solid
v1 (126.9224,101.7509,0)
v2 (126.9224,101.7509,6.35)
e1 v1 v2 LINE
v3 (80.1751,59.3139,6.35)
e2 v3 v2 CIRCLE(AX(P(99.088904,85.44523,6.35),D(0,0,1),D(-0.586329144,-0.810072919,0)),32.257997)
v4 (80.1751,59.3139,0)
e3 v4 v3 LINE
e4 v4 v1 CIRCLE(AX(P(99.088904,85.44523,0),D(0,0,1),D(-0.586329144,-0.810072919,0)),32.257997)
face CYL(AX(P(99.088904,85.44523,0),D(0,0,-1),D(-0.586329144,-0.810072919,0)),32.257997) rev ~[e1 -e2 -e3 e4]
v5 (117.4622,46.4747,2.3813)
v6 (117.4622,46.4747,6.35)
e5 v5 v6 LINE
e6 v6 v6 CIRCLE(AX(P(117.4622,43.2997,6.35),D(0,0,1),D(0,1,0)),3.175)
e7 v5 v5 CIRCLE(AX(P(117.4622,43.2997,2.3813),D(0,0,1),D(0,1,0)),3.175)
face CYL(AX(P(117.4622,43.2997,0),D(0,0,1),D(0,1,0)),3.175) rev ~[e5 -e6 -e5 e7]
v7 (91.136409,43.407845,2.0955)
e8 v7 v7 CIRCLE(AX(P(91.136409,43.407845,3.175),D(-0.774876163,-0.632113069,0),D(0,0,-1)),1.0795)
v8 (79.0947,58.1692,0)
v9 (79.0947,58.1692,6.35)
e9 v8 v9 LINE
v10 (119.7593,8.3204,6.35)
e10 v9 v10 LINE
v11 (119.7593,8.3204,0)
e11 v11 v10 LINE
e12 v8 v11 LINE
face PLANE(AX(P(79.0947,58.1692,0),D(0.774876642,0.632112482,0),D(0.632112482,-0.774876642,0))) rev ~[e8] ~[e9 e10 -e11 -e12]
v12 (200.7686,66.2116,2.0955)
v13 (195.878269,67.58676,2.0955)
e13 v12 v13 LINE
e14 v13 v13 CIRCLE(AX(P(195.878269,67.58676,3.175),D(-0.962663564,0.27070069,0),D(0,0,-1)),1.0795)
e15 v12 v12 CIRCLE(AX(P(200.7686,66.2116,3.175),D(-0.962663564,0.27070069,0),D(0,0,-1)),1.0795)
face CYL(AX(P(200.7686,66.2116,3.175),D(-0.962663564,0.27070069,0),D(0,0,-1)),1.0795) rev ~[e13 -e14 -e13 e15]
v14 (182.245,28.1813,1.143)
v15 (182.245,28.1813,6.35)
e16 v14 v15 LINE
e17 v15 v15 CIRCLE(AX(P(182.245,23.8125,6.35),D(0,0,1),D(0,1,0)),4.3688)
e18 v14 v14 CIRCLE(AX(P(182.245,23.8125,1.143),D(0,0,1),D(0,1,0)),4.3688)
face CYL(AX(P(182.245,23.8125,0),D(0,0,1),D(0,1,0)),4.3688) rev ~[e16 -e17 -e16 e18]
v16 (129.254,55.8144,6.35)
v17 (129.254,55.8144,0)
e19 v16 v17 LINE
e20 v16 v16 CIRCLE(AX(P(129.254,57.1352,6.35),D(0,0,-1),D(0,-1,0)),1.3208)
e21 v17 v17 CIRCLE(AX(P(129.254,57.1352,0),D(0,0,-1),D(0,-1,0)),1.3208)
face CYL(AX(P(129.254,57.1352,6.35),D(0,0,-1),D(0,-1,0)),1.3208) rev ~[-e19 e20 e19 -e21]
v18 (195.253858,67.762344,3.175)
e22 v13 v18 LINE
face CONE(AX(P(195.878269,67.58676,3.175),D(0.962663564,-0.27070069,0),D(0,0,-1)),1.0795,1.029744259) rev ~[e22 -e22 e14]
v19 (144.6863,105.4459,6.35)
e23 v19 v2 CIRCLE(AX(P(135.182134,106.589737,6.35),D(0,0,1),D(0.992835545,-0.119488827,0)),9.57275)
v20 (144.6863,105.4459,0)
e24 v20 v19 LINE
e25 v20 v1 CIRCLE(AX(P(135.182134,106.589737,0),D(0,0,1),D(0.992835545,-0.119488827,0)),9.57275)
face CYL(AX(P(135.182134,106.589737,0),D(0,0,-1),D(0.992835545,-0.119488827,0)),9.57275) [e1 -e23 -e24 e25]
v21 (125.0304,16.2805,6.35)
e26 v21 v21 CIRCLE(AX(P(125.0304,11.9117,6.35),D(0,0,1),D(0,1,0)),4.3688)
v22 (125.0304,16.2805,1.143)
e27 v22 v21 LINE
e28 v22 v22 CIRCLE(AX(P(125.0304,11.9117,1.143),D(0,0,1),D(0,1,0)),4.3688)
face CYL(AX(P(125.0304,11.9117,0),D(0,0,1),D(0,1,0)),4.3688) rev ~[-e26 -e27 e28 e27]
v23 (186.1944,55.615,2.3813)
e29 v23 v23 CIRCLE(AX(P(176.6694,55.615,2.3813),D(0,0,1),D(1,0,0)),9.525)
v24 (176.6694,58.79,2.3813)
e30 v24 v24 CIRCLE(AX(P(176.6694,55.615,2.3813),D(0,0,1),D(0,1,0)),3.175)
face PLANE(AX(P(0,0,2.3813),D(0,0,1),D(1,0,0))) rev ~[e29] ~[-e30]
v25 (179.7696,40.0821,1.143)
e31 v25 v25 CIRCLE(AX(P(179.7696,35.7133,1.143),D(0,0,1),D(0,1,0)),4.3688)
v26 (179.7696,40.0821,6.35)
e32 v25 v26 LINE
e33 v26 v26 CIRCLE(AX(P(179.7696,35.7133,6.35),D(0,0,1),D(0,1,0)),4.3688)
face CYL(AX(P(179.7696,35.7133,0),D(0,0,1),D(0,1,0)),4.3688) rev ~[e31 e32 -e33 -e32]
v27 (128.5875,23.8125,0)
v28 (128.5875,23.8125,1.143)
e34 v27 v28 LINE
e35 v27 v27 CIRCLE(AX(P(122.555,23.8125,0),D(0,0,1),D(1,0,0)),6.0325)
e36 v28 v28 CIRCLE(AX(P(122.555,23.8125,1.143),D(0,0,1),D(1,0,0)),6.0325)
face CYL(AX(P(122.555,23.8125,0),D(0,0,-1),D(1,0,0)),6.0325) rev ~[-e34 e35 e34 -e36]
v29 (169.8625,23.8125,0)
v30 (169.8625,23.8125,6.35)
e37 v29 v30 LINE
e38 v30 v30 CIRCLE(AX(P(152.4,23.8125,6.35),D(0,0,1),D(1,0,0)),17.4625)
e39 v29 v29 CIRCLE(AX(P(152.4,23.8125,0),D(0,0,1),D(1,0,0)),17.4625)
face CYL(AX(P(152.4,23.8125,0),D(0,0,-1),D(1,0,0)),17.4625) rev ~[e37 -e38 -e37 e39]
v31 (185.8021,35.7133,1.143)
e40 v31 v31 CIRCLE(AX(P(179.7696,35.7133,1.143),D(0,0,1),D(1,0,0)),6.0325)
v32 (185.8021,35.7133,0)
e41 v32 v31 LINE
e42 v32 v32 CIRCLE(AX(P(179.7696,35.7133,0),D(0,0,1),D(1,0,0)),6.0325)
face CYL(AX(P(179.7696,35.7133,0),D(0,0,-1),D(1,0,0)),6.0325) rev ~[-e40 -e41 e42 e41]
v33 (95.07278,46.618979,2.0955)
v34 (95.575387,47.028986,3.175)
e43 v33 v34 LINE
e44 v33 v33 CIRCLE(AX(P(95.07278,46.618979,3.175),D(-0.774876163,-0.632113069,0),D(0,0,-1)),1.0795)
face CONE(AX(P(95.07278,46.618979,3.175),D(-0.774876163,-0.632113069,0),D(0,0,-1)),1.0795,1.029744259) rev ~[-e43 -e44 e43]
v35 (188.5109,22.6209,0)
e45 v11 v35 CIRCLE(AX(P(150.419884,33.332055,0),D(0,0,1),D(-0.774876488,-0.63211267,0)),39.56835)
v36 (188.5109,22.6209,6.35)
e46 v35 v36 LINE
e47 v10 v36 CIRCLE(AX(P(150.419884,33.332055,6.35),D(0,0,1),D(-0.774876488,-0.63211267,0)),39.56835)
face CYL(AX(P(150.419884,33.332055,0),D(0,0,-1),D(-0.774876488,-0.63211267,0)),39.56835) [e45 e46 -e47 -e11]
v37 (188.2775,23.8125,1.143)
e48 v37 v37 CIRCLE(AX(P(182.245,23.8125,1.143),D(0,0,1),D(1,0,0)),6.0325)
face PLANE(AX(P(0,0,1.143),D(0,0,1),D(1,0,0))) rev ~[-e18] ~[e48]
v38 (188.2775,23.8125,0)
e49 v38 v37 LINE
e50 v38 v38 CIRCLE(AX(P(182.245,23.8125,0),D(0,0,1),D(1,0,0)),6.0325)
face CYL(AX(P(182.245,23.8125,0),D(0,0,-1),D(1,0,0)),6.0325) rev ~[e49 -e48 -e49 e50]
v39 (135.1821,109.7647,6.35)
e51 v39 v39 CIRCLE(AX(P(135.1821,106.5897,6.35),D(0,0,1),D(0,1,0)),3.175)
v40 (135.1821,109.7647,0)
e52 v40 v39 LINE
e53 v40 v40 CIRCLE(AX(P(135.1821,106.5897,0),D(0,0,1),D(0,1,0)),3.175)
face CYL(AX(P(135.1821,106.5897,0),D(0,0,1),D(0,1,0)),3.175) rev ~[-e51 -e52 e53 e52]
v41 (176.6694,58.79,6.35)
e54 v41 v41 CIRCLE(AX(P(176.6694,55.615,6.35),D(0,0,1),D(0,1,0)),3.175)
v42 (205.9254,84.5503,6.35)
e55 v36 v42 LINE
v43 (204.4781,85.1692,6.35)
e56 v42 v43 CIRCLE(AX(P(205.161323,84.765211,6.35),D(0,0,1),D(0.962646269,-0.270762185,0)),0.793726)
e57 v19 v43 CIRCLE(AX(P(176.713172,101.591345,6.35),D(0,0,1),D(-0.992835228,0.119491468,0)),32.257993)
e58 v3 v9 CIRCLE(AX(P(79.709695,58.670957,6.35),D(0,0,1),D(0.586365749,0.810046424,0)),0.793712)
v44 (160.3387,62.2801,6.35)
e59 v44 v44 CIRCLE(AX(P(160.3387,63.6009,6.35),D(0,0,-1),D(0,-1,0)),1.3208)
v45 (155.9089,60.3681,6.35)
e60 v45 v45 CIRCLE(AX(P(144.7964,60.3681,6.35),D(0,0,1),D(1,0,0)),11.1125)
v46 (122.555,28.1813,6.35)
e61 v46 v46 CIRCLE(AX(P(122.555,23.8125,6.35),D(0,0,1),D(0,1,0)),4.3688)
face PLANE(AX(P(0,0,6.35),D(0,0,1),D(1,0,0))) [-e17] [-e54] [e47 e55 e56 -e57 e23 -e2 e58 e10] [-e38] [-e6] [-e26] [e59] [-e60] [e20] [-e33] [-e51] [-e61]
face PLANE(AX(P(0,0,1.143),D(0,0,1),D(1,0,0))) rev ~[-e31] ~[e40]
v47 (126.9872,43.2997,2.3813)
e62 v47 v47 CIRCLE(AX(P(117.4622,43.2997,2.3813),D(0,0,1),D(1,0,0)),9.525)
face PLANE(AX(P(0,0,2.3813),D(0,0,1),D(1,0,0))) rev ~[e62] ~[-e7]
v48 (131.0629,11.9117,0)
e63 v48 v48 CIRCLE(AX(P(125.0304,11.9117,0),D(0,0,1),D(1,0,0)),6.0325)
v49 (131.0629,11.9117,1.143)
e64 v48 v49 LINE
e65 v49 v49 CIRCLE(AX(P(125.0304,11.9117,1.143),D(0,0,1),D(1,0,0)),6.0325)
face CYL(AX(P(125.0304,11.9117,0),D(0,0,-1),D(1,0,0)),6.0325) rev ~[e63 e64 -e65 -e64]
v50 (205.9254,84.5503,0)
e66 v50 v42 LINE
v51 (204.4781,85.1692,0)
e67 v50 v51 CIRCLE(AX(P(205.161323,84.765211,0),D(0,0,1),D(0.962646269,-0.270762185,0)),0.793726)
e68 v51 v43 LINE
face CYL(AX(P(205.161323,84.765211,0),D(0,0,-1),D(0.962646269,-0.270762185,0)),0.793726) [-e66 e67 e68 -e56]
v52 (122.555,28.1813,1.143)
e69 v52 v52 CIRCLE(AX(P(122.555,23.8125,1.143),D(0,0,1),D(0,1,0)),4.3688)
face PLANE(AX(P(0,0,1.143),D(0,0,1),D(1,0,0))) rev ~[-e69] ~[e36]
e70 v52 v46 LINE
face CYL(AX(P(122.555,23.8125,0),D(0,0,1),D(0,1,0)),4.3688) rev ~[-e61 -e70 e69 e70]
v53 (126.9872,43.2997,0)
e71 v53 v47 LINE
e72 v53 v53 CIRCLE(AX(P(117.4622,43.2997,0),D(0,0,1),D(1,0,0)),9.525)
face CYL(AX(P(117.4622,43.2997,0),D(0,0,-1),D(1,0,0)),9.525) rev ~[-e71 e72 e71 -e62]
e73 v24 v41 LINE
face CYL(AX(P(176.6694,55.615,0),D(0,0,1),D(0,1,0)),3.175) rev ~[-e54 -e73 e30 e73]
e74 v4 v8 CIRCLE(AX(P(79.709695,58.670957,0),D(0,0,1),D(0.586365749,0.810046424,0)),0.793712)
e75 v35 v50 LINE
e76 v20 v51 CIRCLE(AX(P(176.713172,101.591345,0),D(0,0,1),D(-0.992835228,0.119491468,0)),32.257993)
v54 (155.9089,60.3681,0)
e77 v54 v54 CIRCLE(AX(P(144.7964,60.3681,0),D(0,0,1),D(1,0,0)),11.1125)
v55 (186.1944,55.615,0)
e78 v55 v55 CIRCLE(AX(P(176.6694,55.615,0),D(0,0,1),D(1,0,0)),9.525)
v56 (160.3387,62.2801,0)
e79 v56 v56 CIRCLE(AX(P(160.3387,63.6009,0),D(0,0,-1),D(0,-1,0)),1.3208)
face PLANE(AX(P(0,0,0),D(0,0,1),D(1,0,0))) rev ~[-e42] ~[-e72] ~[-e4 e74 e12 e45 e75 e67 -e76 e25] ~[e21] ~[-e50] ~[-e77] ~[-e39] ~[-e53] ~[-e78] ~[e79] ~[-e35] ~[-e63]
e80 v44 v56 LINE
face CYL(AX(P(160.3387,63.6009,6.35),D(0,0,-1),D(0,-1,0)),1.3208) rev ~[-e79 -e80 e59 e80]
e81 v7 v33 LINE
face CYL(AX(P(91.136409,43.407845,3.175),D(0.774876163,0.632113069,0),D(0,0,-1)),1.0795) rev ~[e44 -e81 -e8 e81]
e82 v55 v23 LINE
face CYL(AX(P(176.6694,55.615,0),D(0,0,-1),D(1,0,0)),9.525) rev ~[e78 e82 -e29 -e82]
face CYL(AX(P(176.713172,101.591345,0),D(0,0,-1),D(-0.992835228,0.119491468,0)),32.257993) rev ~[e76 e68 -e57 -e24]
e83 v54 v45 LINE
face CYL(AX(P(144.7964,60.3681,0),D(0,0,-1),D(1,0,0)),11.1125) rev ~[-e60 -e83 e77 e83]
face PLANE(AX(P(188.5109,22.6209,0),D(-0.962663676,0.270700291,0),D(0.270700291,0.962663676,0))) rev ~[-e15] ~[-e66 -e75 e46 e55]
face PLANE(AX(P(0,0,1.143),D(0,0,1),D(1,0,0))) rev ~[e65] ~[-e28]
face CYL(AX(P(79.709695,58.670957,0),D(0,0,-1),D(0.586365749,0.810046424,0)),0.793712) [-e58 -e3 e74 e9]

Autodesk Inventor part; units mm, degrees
ref_plane "YZ Plane" through (0, 0, 0) normal (1, 0, 0) x (0, 1, 0)
ref_plane "XZ Plane" through (0, 0, 0) normal (0, 1, 0) x (-1, 0, 0)
sketch "Main Outline" plane through (0, 0, 0) normal (0, 0, 1) x (1, 0, 0)
  line L0 (0, 0) -> (304.8, 0) construction
  line L1 (304.8, 0) -> (304.8, 50.8) construction
  line L2 (304.8, 50.8) -> (0, 50.8) construction
  line L3 (0, 50.8) -> (0, 0) construction
  line L4 (0, 50.8) -> (0, 53.34) construction
  line L5 (0, 53.34) -> (304.8, 53.34) construction
  line L6 (304.8, 53.34) -> (304.8, 50.8) construction
  circle A0 centre (152.4, 23.8125) radius 17.4625 construction
  line L7 (152.4, 23.8125) -> (152.4, 0) construction
  circle A1 centre (152.4, 23.8125) radius 27.94 construction
  circle A2 centre (152.4, 23.8125) radius 21.59 construction
  line L8 (152.4, 23.8125) -> (144.7964, 60.3681) construction
  circle A3 centre (144.7964, 60.3681) radius 15.24 construction
  circle A4 centre (144.7964, 60.3681) radius 8.89 construction
  circle A5 centre (144.7964, 60.3681) radius 14.2875 construction
  arc A6 (164.6591, 71.8014) -> (129.0153, 43.7486) centre (144.7964, 60.3681) ccw construction
  circle A7 centre (98.8106, 85.598) radius 32.258 construction
  circle A8 centre (126.6733, 147.4971) radius 32.258 construction
  circle A9 centre (176.9075, 101.8424) radius 32.258 construction
  circle A10 centre (144.7964, 60.3681) radius 11.1125 construction
  circle A11 centre (152.4, 23.8125) radius 49.53 construction
  line L9 (144.7964, 60.3681) -> (126.6733, 147.4971) construction
  line L10 (144.7964, 60.3681) -> (98.8106, 85.598) construction
  line L11 (98.8106, 85.598) -> (176.9075, 101.8424) construction
  line L12 (176.9075, 101.8424) -> (144.7964, 60.3681) construction
  circle A12 centre (98.8106, 85.598) radius 9.5493 construction
  arc A13 (174.9629, 111.1915) -> (185.6989, 98.1139) centre (176.9075, 101.8424) ccw construction
  circle A14 centre (126.6733, 147.4971) radius 9.5493 construction
  line L13 (96.8659, 94.9472) -> (174.9629, 111.1915) construction
  line L14 (185.6989, 98.1139) -> (165.8956, 51.4198) construction
  line L15 (92.2351, 78.6732) -> (129.0153, 43.7486) construction
  line L16 (174.9629, 111.1915) -> (176.9075, 101.8424) construction
  line L17 (176.9075, 101.8424) -> (185.6989, 98.1139) construction
  arc A15 (185.6989, 98.1139) -> (174.9629, 111.1915) centre (176.9075, 101.8424) ccw construction
  arc A16 (165.8956, 51.4198) -> (164.6591, 71.8014) centre (144.7964, 60.3681) ccw construction
  arc A17 (129.0153, 43.7486) -> (165.8956, 51.4198) centre (144.7964, 60.3681) ccw construction
  circle A18 centre (126.6086, 147.808) radius 32.258 construction
  circle A19 centre (126.544, 148.1188) radius 32.258 construction
  circle A20 centre (126.4793, 148.4297) radius 32.258 construction
  line L18 (126.6733, 147.4971) -> (126.4793, 148.4297) construction
  circle A21 centre (126.738, 147.1863) radius 32.258 construction
  circle A22 centre (117.4622, 43.2997) radius 9.525 construction
  circle A23 centre (176.6694, 55.615) radius 9.525 construction
  line L19 (152.4, 23.8125) -> (117.4622, 43.2997) construction
  line L20 (152.4, 23.8125) -> (176.6694, 55.615) construction
  line L21 (117.4622, 43.2997) -> (98.8106, 85.598) construction
  line L22 (176.6694, 55.615) -> (176.9075, 101.8424) construction
  circle A24 centre (135.1821, 106.5897) radius 7.9375 construction
  line L23 (135.6243, 150.8242) -> (166.2787, 68.353) construction
  circle A25 centre (152.4, 23.8125) radius 29.845 construction
  line L24 (117.1381, 146.979) -> (121.9118, 59.1246) construction
  circle A26 centre (99.0889, 85.4453) radius 32.258 construction
  circle A27 centre (97.9755, 86.0562) radius 32.258 construction
  line L25 (97.9755, 86.0562) -> (98.8106, 85.598) construction
  circle A28 centre (98.2538, 85.9034) radius 32.258 construction
  circle A29 centre (98.5322, 85.7507) radius 32.258 construction
  circle A30 centre (152.4, 23.8125) radius 29.845 construction
  circle A31 centre (122.555, 23.8125) radius 6.35 construction
  circle A32 centre (179.7696, 35.7133) radius 6.35 construction
  line L26 (122.555, 23.8125) -> (152.4, 23.8125) construction
  line L27 (152.4, 23.8125) -> (182.245, 23.8125) construction
  circle A33 centre (182.245, 23.8125) radius 6.35 construction
  circle A34 centre (125.0304, 11.9117) radius 6.35 construction
  circle A35 centre (150.4199, 33.3321) radius 39.5684 construction
  line L28 (72.9795, 65.6655) -> (119.7593, 8.3204) construction
  circle A36 centre (177.4906, 102.5955) radius 32.258 construction
  line L29 (176.9075, 101.8424) -> (177.4906, 102.5955) construction
  circle A37 centre (177.2963, 102.3445) radius 32.258 construction
  circle A38 centre (177.1019, 102.0934) radius 32.258 construction
  circle A39 centre (176.7131, 101.5913) radius 32.258 construction
  line L30 (188.5109, 22.6209) -> (208.5442, 93.8632) construction
  circle A40 centre (135.1821, 106.5897) radius 9.5727 construction
  arc A41 (86.8202, 116.3239) -> (96.3065, 136.4856) centre (81.3304, 131.2195) ccw construction
  arc A42 (158.9123, 149.5077) -> (175.6513, 134.801) centre (174.7462, 150.6502) ccw construction
  line L31 (126.4793, 148.4297) -> (126.9966, 145.9429) construction
  line L32 (116.5322, 146.3607) -> (117.0495, 143.8739) construction
  line L33 (136.9437, 148.0119) -> (136.4264, 150.4987) construction
  arc A43 (136.4264, 150.4987) -> (116.5322, 146.3607) centre (126.4793, 148.4297) ccw construction
  arc A44 (117.0495, 143.8739) -> (136.9437, 148.0119) centre (126.9966, 145.9429) ccw construction
  line L34 (177.4906, 102.5955) -> (175.9357, 100.5871) construction
  line L35 (169.4571, 108.8154) -> (167.9021, 106.807) construction
  line L36 (183.9692, 94.3672) -> (185.5242, 96.3756) construction
  arc A45 (185.5242, 96.3756) -> (169.4571, 108.8154) centre (177.4906, 102.5955) ccw construction
  arc A46 (167.9021, 106.807) -> (183.9692, 94.3672) centre (175.9357, 100.5871) ccw construction
  line L37 (97.9755, 86.0562) -> (100.2023, 84.8344) construction
  line L38 (93.0884, 77.1487) -> (95.3153, 75.927) construction
  line L39 (105.0894, 93.7418) -> (102.8625, 94.9636) construction
  arc A47 (102.8625, 94.9636) -> (93.0884, 77.1487) centre (97.9755, 86.0562) ccw construction
  arc A48 (95.3153, 75.927) -> (105.0894, 93.7418) centre (100.2023, 84.8344) ccw construction
  circle A49 centre (117.4622, 43.2997) radius 3.9687 construction
  circle A50 centre (176.6694, 55.615) radius 3.9687 construction
  line L40 (152.4, 23.8125) -> (158.4777, -5.4071) construction
  arc A51 (80.1751, 59.3139) -> (79.0947, 58.1692) centre (79.7097, 58.6709) ccw construction
  arc A52 (205.9254, 84.5503) -> (204.4781, 85.1692) centre (205.1613, 84.7652) ccw construction
  circle A53 centre (152.4, 23.8125) radius 14.224 construction
  circle A54 centre (135.1821, 106.5897) radius 3.9687 construction
  circle A55 centre (156.538, 3.9183) radius 6.35 construction
  circle A56 centre (156.538, 3.9183) radius 2.0828 construction
  circle A57 centre (152.4, 23.8125) radius 20.32 construction
  line L41 (133.1021, 30.1759) -> (152.4, 23.8125) construction
  line L42 (152.4, 23.8125) -> (167.5599, 37.3432) construction
  circle A58 centre (167.5599, 37.3432) radius 2.0828 construction
  circle A59 centre (167.5599, 37.3432) radius 3.9687 construction
  circle A60 centre (133.1021, 30.1759) radius 2.0828 construction
  circle A61 centre (133.1021, 30.1759) radius 3.9688 construction
  point P0 (126.738, 147.1863)
  point P1 (176.7131, 101.5913)
  dimension "d18" = 99.06
  dimension "d58" = 64.516
  dimension "d86" = 64.516
  dimension "d0" = 304.8
  dimension "d1" = 50.8
  dimension "d2" = 2.54
  dimension "d3" = 34.925
  dimension "d4" = 23.8125
  dimension "d5" = 152.4
  dimension "d6" = 55.88
  dimension "d7" = 43.18
  dimension "d8" = 37.338
  dimension "d10" = 30.48
  dimension "d11" = 17.78
  dimension "d12" = 28.575
  dimension "d13" = 45.8366
  dimension "d14" = 64.516
  dimension "d15" = 64.516
  dimension "d16" = 64.516
  dimension "d17" = 22.225
  dimension "d19" = 52.4523
  dimension "d20" = 88.9939
  dimension "d21" = 19.0986
  dimension "d22" = 19.0986
  dimension "d23" = 19.0986
  dimension "d30" = 124.732
  dimension "d40" = 64.516
  dimension "d41" = 64.516
  dimension "d42" = 64.516
  dimension "d43" = 0.9525
  dimension "d44" = 0.3175
  dimension "d45" = 0.635
  dimension "d46" = 64.516
  dimension "d47" = 0.3175
  dimension "d48" = 19.05
  dimension "d49" = 19.05
  dimension "d50" = 40.005
  dimension "d51" = 40.005
  dimension "d52" = 46.228
  dimension "d54" = 46.228
  dimension "d55" = 15.875
  dimension "d56" = 41.4655
  dimension "d57" = 59.69
  dimension "d59" = 64.516
  dimension "d60" = 64.516
  dimension "d61" = 64.516
  dimension "d62" = 0.3175
  dimension "d63" = 0.3175
  dimension "d64" = 0.635
  dimension "d65" = 0.9525
  dimension "d73" = 12.7
  dimension "d74" = 12.7
  dimension "d76" = 59.69
  dimension "d78" = 12.7
  dimension "d79" = 12.7
  dimension "d80" = 64.516
  dimension "d81" = 0.9525
  dimension "d82" = 64.516
  dimension "d83" = 64.516
  dimension "d84" = 0.3175
  dimension "d85" = 0.635
  dimension "d88" = 0.3175
  dimension "d89" = 31.75
  dimension "d90" = 31.75
  dimension "d94" = 1.5875
  dimension "d95" = 20.32
  dimension "d96" = 1.5875
sketch "Upper CIM C-C Check" plane through (0, 0, 0) normal (0, 0, 1) x (1, 0, 0)
  arc A0 (3.4429, -22.6582) -> (3.4429, 22.6582) centre (0, 0) ccw construction
  arc A1 (90.4285, 9.4409) -> (90.4285, -9.4409) centre (88.9939, 0) ccw construction
  line L0 (88.9939, 0) -> (0, 0) construction
  line L1 (90.4285, 9.4409) -> (3.4429, 22.6582)
  line L2 (3.4429, -22.6582) -> (90.4285, -9.4409)
  arc A2 (90.4285, -9.4409) -> (90.4285, 9.4409) centre (88.9939, 0) ccw
  arc A3 (3.4429, 22.6582) -> (3.4429, -22.6582) centre (0, 0) ccw
  dimension "d24" = 45.8366
  dimension "d25" = 19.0986
  dimension "d26" = 78.9119
  dimension "d27" = 87.984
  dimension "d28" = 27.12
  dimension "d29" = 88.9939
sketch "Mounting Plate" plane through (0, 0, 0) normal (0, 0, 1) x (1, 0, 0)
  arc A0 (80.1751, 59.3139) -> (79.0947, 58.1692) centre (79.7097, 58.6709) ccw construction
  circle A1 centre (135.1821, 106.5897) radius 9.5727 construction
  arc A2 (205.9254, 84.5503) -> (204.4781, 85.1692) centre (205.1613, 84.7652) ccw construction
  circle A3 centre (150.4199, 33.3321) radius 39.5684 construction
  circle A4 centre (152.4, 23.8125) radius 17.4625 projected
  circle A5 centre (152.4, 23.8125) radius 29.845 construction
  circle A6 centre (122.555, 23.8125) radius 6.35 construction
  circle A7 centre (125.0304, 11.9117) radius 6.35 construction
  circle A8 centre (182.245, 23.8125) radius 6.35 construction
  circle A9 centre (179.7696, 35.7133) radius 6.35 construction
  circle A10 centre (144.7964, 60.3681) radius 11.1125 projected
  arc A11 (80.1751, 59.3139) -> (126.9224, 101.7509) centre (99.0889, 85.4453) ccw
  arc A12 (144.6863, 105.4459) -> (204.4781, 85.1692) centre (176.7131, 101.5913) ccw
  line L0 (79.0947, 58.1692) -> (119.7593, 8.3204)
  line L1 (188.5109, 22.6209) -> (205.9254, 84.5503)
  circle A13 centre (117.4622, 43.2997) radius 9.525 projected
  circle A14 centre (176.6694, 55.615) radius 9.525 projected
  arc A15 (144.6863, 105.4459) -> (126.9224, 101.7509) centre (135.1821, 106.5897) ccw
  arc A16 (205.9254, 84.5503) -> (204.4781, 85.1692) centre (205.1613, 84.7652) ccw
  arc A17 (80.1751, 59.3139) -> (79.0947, 58.1692) centre (79.7097, 58.6709) ccw
  arc A18 (119.7593, 8.3204) -> (188.5109, 22.6209) centre (150.4199, 33.3321) ccw
  circle A19 centre (122.555, 23.8125) radius 6.0325
  circle A20 centre (125.0304, 11.9117) radius 6.0325
  circle A21 centre (179.7696, 35.7133) radius 6.0325
  circle A22 centre (182.245, 23.8125) radius 6.0325
  point P0 (0, 0)
  dimension "d117" = 32.258
  dimension "d118" = 32.258
  dimension "d137" = 12.065
  dimension "d138" = 12.065
  dimension "d139" = 12.065
  dimension "d140" = 12.065
extrude "Profile" add sketch "Mounting Plate" along normal blind 6.35 contours A4 | A10 | A11 A15 A12 A16 L1 A18 L0 A17 | A13 | A14 | A19 | A20 | A21 | A22
extrude "Bearing Holes" cut sketch "Mounting Plate" along normal blind 6.35 contours A4 | A10
hole "1/4\"-20 Pem Nut Holes" at (122.555, 23.8125, 0) at (125.0304, 11.9117, 0) at (179.7696, 35.7133, 0) at (182.245, 23.8125, 0) direction (0, 0, 1) diameter 8.7376 end through all
hole "10-32 Pem Nut Holes" at (117.4622, 43.2997, 0) at (176.6694, 55.615, 0) at (135.1821, 106.5897, 0) direction (0, 0, 1) diameter 6.35 end through all
extrude "1/4\"-20 Pem Nut Counterbores" cut sketch "Mounting Plate" along normal blind 1.143 contours A19 | A20 | A21 | A22
extrude "Extrusion4" cut sketch "Mounting Plate" along normal blind 2.3813 contours A13 | A14
sketch "Sketch5" plane through (0, 0, 6.35) normal (0, 0, 1) x (1, 0, 0)
  circle A0 centre (144.7964, 60.3681) radius 11.1125 projected
  circle A1 centre (152.4, 23.8125) radius 17.4625 projected
  arc A2 (144.6863, 105.4459) -> (126.9224, 101.7509) centre (135.1821, 106.5897) ccw projected
  circle A3 centre (144.7964, 60.3681) radius 15.875 construction
  line L0 (129.254, 57.1352) -> (160.3387, 63.6009) construction
  line L1 (152.4, 23.8125) -> (135.1821, 106.5897)
  point P0 (0, 0)
  dimension "d150" = 31.75
hole "Hole3" at (129.254, 57.1352, 6.35) at (160.3387, 63.6009, 6.35) direction (0, 0, -1) diameter 2.6416 end through all thread size "6-32 UNC" class "2B" standard "ANSI Unified Screw Threads"
ref_plane "Work Plane1" through (152.4, 23.8125, 0) normal (0.9790451, 0.2036437, 0) x (-0.2036437, 0.9790451, 0)
sketch "Sketch6" plane through (205.9254, 84.5503, 6.35) normal (0.9626636, -0.2707007, 0) x (0, 0, -1)
  line L0 (6.35, 0) -> (0, 0) projected
  line L1 (0, -64.3313) -> (0, 0) projected
  point P0 (6.35, -137.1376)
  point P1 (3.175, -19.05)
  dimension "d159" = 19.05
  dimension "d160" = 3.175
hole "Hole4" at (200.7686, 66.2116, 3.175) direction (-0.9626636, 0.2707007, 0) diameter 2.159 depth 5.08 tip angle 118
mirror "Mirror1" about plane through (152.4, 23.8125, 0) normal (0.9790451, 0.2036437, 0) of "Hole4"
equation "\"d3\" = r10"
equation "\"d6\" = g44"
equation "\"d7\" = g34"
equation "\"d10\" = g24"
equation "\"d11\" = g14"
equation "\"d12\" = r8"
equation "\"d13\" = p48"
equation "\"d14\" = cim"
equation "\"d15\" = cim"
equation "\"d16\" = cim"
equation "\"d17\" = r6"
equation "\"d21\" = p20"
equation "\"d22\" = p20"
equation "\"d23\" = p20"
equation "\"d24\" = p48"
equation "\"d25\" = p20"
equation "\"d29\" = d20"
equation "\"g14\" = 17.78"
equation "\"g24\" = 30.48"
equation "\"g34\" = 43.18"
equation "\"g44\" = 55.88"
equation "\"p20\" = 19.09859"
equation "\"p48\" = 45.83662"
equation "\"r10\" = 34.925"
equation "\"r9\" = 31.75"
equation "\"r8\" = 28.575"
equation "\"r7\" = 25.4"
equation "\"r6\" = 22.225"
equation "\"r5\" = 19.05"
equation "\"r4\" = 15.875"
equation "\"r3\" = 12.7"
equation "\"cim\" = 64.516"
equation "\"act\" = 28.448"
equation "\"actL\" = 23.749"
equation "\"UpperCimCCCheck\" = 2 * d27 + d26 + d28"
equation "\"LowerBeltPathCCCheck\" = 267"
properties material "Aluminum 6061"
